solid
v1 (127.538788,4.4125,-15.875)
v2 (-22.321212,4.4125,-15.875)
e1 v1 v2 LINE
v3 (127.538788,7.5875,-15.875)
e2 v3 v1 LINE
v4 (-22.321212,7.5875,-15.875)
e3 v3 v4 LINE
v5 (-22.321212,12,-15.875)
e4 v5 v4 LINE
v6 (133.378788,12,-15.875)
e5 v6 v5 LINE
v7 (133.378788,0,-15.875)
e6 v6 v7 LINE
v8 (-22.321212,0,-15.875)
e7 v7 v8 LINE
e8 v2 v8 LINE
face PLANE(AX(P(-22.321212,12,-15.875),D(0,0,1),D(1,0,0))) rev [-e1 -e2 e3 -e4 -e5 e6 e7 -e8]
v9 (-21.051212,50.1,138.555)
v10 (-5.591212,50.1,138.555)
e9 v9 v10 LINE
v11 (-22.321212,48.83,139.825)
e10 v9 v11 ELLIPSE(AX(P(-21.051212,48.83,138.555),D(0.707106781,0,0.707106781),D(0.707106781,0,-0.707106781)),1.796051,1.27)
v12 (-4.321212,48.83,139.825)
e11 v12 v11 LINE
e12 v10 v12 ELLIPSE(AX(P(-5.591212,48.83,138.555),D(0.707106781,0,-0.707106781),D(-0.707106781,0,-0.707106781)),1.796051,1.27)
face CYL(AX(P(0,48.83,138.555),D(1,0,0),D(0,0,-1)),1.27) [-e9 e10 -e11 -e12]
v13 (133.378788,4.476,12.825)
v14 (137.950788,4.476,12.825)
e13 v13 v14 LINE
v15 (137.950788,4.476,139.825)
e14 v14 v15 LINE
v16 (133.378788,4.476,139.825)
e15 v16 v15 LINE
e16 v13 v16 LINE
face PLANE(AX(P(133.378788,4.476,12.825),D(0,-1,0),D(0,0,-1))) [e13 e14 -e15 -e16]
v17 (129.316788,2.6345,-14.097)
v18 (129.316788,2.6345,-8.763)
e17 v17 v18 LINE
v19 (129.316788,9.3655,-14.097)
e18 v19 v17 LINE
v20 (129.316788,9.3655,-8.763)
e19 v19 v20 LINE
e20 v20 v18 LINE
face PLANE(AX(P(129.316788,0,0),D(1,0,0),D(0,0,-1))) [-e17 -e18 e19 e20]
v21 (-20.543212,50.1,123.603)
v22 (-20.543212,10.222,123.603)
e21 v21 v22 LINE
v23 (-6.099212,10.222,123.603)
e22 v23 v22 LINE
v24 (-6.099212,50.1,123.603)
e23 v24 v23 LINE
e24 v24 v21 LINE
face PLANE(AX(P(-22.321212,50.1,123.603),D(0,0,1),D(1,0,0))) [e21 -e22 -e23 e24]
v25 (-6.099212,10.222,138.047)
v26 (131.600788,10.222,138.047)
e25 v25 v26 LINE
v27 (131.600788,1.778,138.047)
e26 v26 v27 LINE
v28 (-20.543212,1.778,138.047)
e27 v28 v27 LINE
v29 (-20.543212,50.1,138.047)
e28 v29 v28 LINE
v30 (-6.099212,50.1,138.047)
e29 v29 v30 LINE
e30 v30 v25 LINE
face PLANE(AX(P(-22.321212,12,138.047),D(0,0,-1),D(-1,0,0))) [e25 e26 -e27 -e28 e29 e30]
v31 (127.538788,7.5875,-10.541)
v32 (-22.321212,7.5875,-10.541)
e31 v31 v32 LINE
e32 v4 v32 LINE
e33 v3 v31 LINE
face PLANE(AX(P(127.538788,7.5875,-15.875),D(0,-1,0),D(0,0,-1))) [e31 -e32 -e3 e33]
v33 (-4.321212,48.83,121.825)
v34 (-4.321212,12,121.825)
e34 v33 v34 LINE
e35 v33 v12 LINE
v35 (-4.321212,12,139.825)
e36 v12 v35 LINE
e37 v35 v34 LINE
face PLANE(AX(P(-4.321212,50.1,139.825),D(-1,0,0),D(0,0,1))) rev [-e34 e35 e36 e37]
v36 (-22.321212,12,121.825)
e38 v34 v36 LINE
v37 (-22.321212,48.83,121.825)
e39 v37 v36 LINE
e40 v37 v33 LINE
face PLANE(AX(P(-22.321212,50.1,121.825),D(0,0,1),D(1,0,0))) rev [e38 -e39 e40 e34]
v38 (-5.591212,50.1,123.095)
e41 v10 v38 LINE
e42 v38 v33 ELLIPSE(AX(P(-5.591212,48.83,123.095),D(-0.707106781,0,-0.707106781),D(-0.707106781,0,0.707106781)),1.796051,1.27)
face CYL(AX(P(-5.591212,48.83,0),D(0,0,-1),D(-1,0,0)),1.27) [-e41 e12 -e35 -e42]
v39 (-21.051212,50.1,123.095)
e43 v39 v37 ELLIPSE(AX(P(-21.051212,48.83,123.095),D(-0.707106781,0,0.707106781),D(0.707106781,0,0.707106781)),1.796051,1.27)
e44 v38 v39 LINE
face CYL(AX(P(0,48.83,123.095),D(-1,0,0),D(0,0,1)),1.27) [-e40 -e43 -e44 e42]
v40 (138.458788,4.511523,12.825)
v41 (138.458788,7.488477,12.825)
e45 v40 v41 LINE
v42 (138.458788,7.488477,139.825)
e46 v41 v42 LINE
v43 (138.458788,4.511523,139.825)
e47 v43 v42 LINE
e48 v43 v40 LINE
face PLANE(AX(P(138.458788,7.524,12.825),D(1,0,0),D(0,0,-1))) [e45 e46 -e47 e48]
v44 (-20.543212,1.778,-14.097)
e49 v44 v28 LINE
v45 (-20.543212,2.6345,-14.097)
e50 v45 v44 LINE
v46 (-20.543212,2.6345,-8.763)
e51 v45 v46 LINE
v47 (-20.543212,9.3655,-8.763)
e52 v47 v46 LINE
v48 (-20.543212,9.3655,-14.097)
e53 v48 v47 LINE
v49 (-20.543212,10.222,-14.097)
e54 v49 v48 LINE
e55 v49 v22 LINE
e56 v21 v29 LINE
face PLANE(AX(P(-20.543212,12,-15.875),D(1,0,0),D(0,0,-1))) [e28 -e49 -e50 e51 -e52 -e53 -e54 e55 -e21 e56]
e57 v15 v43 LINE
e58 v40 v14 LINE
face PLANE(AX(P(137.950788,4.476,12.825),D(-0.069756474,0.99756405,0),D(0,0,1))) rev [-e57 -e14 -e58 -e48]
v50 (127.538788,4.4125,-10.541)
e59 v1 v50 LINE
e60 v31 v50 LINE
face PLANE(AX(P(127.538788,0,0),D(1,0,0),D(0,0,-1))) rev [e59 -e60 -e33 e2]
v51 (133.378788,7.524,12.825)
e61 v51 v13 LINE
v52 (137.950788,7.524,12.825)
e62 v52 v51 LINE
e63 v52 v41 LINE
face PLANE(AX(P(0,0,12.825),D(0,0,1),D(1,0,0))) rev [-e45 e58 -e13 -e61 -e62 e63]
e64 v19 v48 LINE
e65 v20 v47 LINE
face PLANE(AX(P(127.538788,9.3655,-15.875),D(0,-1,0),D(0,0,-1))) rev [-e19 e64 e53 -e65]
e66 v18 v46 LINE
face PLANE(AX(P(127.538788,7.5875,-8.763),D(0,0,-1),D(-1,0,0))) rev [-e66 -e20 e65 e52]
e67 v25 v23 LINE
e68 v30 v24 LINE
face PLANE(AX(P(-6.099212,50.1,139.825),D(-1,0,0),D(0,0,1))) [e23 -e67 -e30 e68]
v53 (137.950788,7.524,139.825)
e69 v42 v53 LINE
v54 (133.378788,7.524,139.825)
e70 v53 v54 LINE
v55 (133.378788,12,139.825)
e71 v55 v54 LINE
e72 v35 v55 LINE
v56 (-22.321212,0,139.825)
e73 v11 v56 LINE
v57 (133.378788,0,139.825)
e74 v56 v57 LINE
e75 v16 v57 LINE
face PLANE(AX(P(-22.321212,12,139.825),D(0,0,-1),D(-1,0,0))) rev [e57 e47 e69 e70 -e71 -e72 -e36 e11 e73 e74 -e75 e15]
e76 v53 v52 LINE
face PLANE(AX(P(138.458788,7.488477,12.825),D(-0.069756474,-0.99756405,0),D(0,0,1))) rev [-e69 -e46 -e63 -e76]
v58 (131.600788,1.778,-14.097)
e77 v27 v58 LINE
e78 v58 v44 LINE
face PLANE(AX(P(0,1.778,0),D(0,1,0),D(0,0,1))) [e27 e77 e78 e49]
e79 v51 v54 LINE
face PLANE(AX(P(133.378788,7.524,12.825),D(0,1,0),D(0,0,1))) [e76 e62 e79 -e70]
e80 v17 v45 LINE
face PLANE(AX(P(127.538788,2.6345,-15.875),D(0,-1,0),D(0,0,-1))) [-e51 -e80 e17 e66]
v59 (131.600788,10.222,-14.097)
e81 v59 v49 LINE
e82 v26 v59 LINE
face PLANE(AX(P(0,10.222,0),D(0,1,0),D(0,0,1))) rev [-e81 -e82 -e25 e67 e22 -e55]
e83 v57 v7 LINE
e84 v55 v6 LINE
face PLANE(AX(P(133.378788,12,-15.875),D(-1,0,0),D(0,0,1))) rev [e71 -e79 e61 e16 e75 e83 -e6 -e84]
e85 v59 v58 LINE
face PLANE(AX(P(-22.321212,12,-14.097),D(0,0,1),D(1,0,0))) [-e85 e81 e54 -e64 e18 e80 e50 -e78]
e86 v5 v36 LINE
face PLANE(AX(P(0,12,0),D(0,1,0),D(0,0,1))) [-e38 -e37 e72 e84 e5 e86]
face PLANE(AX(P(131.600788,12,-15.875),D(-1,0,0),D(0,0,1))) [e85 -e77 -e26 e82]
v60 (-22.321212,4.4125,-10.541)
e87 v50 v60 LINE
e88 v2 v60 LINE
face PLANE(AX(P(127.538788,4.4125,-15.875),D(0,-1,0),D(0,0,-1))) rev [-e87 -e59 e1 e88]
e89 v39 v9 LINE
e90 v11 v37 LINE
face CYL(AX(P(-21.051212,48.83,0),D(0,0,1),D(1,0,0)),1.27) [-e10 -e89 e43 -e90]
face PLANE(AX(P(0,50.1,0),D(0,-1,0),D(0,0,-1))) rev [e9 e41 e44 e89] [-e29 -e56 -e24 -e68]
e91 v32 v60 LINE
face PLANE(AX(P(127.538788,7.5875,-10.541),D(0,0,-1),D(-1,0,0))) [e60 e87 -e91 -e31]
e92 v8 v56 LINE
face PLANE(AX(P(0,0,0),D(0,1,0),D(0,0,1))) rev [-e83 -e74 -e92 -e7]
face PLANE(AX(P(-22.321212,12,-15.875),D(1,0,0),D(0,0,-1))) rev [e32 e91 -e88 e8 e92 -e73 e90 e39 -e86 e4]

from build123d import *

# Parameters (mm, degrees)
SKETCH1_W           = 155.7
SKETCH1_H           = 155.7
BOSS_EXTRUDE2_DEPTH = 12
SKETCH2_W           = 18
SKETCH2_H           = 18
BOSS_EXTRUDE3_DEPTH = 38.1
SKETCH3_W           = 5.08
SKETCH3_H           = 3.048
BOSS_EXTRUDE4_DEPTH = 127
CHAMFER1_SIZE       = 0.508
CHAMFER1_SIZE2      = 0.03552282
CHAMFER2_SIZE       = 0.508
CHAMFER2_SIZE2      = 0.03552282
SKETCH4_W           = 5.334
SKETCH4_H           = 3.175
CUT_EXTRUDE3_DEPTH  = 149.86
SHELL1_START        = -20.543212121
SHELL1_DEPTH        = 152.144
SHELL1_2_OUTLINE_W  = 39.878
SHELL1_2_OUTLINE_H  = 14.444
SHELL1_2_DEPTH      = 14.444
SHELL1_START_2      = 129.316787879
SHELL1_3_OUTLINE_W  = 6.731
SHELL1_3_OUTLINE_H  = 5.334
SHELL1_3_DEPTH      = 2.284
FILLET1_R           = 1.27


# Read off the part's stored shape, not the designer's step: Shell1
with BuildPart() as part:
    # Sketch1 → Boss-Extrude2 (new body)
    with BuildSketch(Plane(origin=(0, 0, 0), x_dir=(1, 0, 0), z_dir=(0, 1, 0))):
        with Locations((55.528787879, -61.975)):
            Rectangle(SKETCH1_W, SKETCH1_H)
    extrude(amount=BOSS_EXTRUDE2_DEPTH)

    # Sketch2 → Boss-Extrude3 (add)
    with BuildSketch(Plane(origin=(0, 12, 0), x_dir=(1, 0, 0), z_dir=(0, 1, 0))):
        with Locations((-13.321212121, -130.825)):
            Rectangle(SKETCH2_W, SKETCH2_H)
    extrude(amount=BOSS_EXTRUDE3_DEPTH)

    # Sketch3 → Boss-Extrude4 (add)
    with BuildSketch(Plane.XY.offset(139.825)):
        with Locations((135.918787879, 6)):
            Rectangle(SKETCH3_W, SKETCH3_H)
    extrude(amount=-BOSS_EXTRUDE4_DEPTH)

    # Chamfer1
    chamfer1_edges = [part.edges().sort_by_distance(p)[0] for p in [
        (138.458787879, 7.524, 76.325),
    ]]
    chamfer1_side = [part.faces().sort_by_distance(p)[0] for p in [
        (135.918787879, 7.524, 76.325),
    ]]
    chamfer(chamfer1_edges, length=CHAMFER1_SIZE, length2=CHAMFER1_SIZE2, reference=chamfer1_side[0])

    # Chamfer2
    chamfer2_edges = [part.edges().sort_by_distance(p)[0] for p in [
        (138.458787879, 4.476, 76.325),
    ]]
    chamfer2_side = [part.faces().sort_by_distance(p)[0] for p in [
        (135.918787879, 4.476, 76.325),
    ]]
    chamfer(chamfer2_edges, length=CHAMFER2_SIZE, length2=CHAMFER2_SIZE2, reference=chamfer2_side[0])

    # Sketch4 → Cut-Extrude3 (cut)
    with BuildSketch(Plane.ZY.offset(22.321212121)):
        with Locations((-13.208, 6)):
            Rectangle(SKETCH4_W, SKETCH4_H)
    extrude(amount=-CUT_EXTRUDE3_DEPTH, mode=Mode.SUBTRACT)

    # Shell1 outline → Shell1 (cut)
    with BuildSketch(Plane.YZ.offset(SHELL1_START)):
        Polygon((10.222, 138.047), (1.778, 138.047), (1.778, -14.097), (2.6345, -14.097), (2.6345, -8.763), (9.3655, -8.763), (9.3655, -14.097), (10.222, -14.097), align=None)
    extrude(amount=SHELL1_DEPTH, mode=Mode.SUBTRACT)

    # Shell1 2 outline → Shell1 2 (cut)
    with BuildSketch(Plane.YZ.offset(SHELL1_START)):
        with Locations((30.161, 130.825)):
            Rectangle(SHELL1_2_OUTLINE_W, SHELL1_2_OUTLINE_H)
    extrude(amount=SHELL1_2_DEPTH, mode=Mode.SUBTRACT)

    # Shell1 3 outline → Shell1 3 (cut)
    with BuildSketch(Plane.YZ.offset(SHELL1_START_2)):
        with Locations((6, -11.43)):
            Rectangle(SHELL1_3_OUTLINE_W, SHELL1_3_OUTLINE_H)
    extrude(amount=SHELL1_3_DEPTH, mode=Mode.SUBTRACT)

    # Fillet1
    fillet1_edges = [part.edges().sort_by_distance(p)[0] for p in [
        (-22.321212121, 50.1, 130.825),
        (-13.321212121, 50.1, 139.825),
        (-4.321212121, 50.1, 130.825),
        (-13.321212121, 50.1, 121.825),
    ]]
    fillet(fillet1_edges, radius=FILLET1_R)


solid = part.part
